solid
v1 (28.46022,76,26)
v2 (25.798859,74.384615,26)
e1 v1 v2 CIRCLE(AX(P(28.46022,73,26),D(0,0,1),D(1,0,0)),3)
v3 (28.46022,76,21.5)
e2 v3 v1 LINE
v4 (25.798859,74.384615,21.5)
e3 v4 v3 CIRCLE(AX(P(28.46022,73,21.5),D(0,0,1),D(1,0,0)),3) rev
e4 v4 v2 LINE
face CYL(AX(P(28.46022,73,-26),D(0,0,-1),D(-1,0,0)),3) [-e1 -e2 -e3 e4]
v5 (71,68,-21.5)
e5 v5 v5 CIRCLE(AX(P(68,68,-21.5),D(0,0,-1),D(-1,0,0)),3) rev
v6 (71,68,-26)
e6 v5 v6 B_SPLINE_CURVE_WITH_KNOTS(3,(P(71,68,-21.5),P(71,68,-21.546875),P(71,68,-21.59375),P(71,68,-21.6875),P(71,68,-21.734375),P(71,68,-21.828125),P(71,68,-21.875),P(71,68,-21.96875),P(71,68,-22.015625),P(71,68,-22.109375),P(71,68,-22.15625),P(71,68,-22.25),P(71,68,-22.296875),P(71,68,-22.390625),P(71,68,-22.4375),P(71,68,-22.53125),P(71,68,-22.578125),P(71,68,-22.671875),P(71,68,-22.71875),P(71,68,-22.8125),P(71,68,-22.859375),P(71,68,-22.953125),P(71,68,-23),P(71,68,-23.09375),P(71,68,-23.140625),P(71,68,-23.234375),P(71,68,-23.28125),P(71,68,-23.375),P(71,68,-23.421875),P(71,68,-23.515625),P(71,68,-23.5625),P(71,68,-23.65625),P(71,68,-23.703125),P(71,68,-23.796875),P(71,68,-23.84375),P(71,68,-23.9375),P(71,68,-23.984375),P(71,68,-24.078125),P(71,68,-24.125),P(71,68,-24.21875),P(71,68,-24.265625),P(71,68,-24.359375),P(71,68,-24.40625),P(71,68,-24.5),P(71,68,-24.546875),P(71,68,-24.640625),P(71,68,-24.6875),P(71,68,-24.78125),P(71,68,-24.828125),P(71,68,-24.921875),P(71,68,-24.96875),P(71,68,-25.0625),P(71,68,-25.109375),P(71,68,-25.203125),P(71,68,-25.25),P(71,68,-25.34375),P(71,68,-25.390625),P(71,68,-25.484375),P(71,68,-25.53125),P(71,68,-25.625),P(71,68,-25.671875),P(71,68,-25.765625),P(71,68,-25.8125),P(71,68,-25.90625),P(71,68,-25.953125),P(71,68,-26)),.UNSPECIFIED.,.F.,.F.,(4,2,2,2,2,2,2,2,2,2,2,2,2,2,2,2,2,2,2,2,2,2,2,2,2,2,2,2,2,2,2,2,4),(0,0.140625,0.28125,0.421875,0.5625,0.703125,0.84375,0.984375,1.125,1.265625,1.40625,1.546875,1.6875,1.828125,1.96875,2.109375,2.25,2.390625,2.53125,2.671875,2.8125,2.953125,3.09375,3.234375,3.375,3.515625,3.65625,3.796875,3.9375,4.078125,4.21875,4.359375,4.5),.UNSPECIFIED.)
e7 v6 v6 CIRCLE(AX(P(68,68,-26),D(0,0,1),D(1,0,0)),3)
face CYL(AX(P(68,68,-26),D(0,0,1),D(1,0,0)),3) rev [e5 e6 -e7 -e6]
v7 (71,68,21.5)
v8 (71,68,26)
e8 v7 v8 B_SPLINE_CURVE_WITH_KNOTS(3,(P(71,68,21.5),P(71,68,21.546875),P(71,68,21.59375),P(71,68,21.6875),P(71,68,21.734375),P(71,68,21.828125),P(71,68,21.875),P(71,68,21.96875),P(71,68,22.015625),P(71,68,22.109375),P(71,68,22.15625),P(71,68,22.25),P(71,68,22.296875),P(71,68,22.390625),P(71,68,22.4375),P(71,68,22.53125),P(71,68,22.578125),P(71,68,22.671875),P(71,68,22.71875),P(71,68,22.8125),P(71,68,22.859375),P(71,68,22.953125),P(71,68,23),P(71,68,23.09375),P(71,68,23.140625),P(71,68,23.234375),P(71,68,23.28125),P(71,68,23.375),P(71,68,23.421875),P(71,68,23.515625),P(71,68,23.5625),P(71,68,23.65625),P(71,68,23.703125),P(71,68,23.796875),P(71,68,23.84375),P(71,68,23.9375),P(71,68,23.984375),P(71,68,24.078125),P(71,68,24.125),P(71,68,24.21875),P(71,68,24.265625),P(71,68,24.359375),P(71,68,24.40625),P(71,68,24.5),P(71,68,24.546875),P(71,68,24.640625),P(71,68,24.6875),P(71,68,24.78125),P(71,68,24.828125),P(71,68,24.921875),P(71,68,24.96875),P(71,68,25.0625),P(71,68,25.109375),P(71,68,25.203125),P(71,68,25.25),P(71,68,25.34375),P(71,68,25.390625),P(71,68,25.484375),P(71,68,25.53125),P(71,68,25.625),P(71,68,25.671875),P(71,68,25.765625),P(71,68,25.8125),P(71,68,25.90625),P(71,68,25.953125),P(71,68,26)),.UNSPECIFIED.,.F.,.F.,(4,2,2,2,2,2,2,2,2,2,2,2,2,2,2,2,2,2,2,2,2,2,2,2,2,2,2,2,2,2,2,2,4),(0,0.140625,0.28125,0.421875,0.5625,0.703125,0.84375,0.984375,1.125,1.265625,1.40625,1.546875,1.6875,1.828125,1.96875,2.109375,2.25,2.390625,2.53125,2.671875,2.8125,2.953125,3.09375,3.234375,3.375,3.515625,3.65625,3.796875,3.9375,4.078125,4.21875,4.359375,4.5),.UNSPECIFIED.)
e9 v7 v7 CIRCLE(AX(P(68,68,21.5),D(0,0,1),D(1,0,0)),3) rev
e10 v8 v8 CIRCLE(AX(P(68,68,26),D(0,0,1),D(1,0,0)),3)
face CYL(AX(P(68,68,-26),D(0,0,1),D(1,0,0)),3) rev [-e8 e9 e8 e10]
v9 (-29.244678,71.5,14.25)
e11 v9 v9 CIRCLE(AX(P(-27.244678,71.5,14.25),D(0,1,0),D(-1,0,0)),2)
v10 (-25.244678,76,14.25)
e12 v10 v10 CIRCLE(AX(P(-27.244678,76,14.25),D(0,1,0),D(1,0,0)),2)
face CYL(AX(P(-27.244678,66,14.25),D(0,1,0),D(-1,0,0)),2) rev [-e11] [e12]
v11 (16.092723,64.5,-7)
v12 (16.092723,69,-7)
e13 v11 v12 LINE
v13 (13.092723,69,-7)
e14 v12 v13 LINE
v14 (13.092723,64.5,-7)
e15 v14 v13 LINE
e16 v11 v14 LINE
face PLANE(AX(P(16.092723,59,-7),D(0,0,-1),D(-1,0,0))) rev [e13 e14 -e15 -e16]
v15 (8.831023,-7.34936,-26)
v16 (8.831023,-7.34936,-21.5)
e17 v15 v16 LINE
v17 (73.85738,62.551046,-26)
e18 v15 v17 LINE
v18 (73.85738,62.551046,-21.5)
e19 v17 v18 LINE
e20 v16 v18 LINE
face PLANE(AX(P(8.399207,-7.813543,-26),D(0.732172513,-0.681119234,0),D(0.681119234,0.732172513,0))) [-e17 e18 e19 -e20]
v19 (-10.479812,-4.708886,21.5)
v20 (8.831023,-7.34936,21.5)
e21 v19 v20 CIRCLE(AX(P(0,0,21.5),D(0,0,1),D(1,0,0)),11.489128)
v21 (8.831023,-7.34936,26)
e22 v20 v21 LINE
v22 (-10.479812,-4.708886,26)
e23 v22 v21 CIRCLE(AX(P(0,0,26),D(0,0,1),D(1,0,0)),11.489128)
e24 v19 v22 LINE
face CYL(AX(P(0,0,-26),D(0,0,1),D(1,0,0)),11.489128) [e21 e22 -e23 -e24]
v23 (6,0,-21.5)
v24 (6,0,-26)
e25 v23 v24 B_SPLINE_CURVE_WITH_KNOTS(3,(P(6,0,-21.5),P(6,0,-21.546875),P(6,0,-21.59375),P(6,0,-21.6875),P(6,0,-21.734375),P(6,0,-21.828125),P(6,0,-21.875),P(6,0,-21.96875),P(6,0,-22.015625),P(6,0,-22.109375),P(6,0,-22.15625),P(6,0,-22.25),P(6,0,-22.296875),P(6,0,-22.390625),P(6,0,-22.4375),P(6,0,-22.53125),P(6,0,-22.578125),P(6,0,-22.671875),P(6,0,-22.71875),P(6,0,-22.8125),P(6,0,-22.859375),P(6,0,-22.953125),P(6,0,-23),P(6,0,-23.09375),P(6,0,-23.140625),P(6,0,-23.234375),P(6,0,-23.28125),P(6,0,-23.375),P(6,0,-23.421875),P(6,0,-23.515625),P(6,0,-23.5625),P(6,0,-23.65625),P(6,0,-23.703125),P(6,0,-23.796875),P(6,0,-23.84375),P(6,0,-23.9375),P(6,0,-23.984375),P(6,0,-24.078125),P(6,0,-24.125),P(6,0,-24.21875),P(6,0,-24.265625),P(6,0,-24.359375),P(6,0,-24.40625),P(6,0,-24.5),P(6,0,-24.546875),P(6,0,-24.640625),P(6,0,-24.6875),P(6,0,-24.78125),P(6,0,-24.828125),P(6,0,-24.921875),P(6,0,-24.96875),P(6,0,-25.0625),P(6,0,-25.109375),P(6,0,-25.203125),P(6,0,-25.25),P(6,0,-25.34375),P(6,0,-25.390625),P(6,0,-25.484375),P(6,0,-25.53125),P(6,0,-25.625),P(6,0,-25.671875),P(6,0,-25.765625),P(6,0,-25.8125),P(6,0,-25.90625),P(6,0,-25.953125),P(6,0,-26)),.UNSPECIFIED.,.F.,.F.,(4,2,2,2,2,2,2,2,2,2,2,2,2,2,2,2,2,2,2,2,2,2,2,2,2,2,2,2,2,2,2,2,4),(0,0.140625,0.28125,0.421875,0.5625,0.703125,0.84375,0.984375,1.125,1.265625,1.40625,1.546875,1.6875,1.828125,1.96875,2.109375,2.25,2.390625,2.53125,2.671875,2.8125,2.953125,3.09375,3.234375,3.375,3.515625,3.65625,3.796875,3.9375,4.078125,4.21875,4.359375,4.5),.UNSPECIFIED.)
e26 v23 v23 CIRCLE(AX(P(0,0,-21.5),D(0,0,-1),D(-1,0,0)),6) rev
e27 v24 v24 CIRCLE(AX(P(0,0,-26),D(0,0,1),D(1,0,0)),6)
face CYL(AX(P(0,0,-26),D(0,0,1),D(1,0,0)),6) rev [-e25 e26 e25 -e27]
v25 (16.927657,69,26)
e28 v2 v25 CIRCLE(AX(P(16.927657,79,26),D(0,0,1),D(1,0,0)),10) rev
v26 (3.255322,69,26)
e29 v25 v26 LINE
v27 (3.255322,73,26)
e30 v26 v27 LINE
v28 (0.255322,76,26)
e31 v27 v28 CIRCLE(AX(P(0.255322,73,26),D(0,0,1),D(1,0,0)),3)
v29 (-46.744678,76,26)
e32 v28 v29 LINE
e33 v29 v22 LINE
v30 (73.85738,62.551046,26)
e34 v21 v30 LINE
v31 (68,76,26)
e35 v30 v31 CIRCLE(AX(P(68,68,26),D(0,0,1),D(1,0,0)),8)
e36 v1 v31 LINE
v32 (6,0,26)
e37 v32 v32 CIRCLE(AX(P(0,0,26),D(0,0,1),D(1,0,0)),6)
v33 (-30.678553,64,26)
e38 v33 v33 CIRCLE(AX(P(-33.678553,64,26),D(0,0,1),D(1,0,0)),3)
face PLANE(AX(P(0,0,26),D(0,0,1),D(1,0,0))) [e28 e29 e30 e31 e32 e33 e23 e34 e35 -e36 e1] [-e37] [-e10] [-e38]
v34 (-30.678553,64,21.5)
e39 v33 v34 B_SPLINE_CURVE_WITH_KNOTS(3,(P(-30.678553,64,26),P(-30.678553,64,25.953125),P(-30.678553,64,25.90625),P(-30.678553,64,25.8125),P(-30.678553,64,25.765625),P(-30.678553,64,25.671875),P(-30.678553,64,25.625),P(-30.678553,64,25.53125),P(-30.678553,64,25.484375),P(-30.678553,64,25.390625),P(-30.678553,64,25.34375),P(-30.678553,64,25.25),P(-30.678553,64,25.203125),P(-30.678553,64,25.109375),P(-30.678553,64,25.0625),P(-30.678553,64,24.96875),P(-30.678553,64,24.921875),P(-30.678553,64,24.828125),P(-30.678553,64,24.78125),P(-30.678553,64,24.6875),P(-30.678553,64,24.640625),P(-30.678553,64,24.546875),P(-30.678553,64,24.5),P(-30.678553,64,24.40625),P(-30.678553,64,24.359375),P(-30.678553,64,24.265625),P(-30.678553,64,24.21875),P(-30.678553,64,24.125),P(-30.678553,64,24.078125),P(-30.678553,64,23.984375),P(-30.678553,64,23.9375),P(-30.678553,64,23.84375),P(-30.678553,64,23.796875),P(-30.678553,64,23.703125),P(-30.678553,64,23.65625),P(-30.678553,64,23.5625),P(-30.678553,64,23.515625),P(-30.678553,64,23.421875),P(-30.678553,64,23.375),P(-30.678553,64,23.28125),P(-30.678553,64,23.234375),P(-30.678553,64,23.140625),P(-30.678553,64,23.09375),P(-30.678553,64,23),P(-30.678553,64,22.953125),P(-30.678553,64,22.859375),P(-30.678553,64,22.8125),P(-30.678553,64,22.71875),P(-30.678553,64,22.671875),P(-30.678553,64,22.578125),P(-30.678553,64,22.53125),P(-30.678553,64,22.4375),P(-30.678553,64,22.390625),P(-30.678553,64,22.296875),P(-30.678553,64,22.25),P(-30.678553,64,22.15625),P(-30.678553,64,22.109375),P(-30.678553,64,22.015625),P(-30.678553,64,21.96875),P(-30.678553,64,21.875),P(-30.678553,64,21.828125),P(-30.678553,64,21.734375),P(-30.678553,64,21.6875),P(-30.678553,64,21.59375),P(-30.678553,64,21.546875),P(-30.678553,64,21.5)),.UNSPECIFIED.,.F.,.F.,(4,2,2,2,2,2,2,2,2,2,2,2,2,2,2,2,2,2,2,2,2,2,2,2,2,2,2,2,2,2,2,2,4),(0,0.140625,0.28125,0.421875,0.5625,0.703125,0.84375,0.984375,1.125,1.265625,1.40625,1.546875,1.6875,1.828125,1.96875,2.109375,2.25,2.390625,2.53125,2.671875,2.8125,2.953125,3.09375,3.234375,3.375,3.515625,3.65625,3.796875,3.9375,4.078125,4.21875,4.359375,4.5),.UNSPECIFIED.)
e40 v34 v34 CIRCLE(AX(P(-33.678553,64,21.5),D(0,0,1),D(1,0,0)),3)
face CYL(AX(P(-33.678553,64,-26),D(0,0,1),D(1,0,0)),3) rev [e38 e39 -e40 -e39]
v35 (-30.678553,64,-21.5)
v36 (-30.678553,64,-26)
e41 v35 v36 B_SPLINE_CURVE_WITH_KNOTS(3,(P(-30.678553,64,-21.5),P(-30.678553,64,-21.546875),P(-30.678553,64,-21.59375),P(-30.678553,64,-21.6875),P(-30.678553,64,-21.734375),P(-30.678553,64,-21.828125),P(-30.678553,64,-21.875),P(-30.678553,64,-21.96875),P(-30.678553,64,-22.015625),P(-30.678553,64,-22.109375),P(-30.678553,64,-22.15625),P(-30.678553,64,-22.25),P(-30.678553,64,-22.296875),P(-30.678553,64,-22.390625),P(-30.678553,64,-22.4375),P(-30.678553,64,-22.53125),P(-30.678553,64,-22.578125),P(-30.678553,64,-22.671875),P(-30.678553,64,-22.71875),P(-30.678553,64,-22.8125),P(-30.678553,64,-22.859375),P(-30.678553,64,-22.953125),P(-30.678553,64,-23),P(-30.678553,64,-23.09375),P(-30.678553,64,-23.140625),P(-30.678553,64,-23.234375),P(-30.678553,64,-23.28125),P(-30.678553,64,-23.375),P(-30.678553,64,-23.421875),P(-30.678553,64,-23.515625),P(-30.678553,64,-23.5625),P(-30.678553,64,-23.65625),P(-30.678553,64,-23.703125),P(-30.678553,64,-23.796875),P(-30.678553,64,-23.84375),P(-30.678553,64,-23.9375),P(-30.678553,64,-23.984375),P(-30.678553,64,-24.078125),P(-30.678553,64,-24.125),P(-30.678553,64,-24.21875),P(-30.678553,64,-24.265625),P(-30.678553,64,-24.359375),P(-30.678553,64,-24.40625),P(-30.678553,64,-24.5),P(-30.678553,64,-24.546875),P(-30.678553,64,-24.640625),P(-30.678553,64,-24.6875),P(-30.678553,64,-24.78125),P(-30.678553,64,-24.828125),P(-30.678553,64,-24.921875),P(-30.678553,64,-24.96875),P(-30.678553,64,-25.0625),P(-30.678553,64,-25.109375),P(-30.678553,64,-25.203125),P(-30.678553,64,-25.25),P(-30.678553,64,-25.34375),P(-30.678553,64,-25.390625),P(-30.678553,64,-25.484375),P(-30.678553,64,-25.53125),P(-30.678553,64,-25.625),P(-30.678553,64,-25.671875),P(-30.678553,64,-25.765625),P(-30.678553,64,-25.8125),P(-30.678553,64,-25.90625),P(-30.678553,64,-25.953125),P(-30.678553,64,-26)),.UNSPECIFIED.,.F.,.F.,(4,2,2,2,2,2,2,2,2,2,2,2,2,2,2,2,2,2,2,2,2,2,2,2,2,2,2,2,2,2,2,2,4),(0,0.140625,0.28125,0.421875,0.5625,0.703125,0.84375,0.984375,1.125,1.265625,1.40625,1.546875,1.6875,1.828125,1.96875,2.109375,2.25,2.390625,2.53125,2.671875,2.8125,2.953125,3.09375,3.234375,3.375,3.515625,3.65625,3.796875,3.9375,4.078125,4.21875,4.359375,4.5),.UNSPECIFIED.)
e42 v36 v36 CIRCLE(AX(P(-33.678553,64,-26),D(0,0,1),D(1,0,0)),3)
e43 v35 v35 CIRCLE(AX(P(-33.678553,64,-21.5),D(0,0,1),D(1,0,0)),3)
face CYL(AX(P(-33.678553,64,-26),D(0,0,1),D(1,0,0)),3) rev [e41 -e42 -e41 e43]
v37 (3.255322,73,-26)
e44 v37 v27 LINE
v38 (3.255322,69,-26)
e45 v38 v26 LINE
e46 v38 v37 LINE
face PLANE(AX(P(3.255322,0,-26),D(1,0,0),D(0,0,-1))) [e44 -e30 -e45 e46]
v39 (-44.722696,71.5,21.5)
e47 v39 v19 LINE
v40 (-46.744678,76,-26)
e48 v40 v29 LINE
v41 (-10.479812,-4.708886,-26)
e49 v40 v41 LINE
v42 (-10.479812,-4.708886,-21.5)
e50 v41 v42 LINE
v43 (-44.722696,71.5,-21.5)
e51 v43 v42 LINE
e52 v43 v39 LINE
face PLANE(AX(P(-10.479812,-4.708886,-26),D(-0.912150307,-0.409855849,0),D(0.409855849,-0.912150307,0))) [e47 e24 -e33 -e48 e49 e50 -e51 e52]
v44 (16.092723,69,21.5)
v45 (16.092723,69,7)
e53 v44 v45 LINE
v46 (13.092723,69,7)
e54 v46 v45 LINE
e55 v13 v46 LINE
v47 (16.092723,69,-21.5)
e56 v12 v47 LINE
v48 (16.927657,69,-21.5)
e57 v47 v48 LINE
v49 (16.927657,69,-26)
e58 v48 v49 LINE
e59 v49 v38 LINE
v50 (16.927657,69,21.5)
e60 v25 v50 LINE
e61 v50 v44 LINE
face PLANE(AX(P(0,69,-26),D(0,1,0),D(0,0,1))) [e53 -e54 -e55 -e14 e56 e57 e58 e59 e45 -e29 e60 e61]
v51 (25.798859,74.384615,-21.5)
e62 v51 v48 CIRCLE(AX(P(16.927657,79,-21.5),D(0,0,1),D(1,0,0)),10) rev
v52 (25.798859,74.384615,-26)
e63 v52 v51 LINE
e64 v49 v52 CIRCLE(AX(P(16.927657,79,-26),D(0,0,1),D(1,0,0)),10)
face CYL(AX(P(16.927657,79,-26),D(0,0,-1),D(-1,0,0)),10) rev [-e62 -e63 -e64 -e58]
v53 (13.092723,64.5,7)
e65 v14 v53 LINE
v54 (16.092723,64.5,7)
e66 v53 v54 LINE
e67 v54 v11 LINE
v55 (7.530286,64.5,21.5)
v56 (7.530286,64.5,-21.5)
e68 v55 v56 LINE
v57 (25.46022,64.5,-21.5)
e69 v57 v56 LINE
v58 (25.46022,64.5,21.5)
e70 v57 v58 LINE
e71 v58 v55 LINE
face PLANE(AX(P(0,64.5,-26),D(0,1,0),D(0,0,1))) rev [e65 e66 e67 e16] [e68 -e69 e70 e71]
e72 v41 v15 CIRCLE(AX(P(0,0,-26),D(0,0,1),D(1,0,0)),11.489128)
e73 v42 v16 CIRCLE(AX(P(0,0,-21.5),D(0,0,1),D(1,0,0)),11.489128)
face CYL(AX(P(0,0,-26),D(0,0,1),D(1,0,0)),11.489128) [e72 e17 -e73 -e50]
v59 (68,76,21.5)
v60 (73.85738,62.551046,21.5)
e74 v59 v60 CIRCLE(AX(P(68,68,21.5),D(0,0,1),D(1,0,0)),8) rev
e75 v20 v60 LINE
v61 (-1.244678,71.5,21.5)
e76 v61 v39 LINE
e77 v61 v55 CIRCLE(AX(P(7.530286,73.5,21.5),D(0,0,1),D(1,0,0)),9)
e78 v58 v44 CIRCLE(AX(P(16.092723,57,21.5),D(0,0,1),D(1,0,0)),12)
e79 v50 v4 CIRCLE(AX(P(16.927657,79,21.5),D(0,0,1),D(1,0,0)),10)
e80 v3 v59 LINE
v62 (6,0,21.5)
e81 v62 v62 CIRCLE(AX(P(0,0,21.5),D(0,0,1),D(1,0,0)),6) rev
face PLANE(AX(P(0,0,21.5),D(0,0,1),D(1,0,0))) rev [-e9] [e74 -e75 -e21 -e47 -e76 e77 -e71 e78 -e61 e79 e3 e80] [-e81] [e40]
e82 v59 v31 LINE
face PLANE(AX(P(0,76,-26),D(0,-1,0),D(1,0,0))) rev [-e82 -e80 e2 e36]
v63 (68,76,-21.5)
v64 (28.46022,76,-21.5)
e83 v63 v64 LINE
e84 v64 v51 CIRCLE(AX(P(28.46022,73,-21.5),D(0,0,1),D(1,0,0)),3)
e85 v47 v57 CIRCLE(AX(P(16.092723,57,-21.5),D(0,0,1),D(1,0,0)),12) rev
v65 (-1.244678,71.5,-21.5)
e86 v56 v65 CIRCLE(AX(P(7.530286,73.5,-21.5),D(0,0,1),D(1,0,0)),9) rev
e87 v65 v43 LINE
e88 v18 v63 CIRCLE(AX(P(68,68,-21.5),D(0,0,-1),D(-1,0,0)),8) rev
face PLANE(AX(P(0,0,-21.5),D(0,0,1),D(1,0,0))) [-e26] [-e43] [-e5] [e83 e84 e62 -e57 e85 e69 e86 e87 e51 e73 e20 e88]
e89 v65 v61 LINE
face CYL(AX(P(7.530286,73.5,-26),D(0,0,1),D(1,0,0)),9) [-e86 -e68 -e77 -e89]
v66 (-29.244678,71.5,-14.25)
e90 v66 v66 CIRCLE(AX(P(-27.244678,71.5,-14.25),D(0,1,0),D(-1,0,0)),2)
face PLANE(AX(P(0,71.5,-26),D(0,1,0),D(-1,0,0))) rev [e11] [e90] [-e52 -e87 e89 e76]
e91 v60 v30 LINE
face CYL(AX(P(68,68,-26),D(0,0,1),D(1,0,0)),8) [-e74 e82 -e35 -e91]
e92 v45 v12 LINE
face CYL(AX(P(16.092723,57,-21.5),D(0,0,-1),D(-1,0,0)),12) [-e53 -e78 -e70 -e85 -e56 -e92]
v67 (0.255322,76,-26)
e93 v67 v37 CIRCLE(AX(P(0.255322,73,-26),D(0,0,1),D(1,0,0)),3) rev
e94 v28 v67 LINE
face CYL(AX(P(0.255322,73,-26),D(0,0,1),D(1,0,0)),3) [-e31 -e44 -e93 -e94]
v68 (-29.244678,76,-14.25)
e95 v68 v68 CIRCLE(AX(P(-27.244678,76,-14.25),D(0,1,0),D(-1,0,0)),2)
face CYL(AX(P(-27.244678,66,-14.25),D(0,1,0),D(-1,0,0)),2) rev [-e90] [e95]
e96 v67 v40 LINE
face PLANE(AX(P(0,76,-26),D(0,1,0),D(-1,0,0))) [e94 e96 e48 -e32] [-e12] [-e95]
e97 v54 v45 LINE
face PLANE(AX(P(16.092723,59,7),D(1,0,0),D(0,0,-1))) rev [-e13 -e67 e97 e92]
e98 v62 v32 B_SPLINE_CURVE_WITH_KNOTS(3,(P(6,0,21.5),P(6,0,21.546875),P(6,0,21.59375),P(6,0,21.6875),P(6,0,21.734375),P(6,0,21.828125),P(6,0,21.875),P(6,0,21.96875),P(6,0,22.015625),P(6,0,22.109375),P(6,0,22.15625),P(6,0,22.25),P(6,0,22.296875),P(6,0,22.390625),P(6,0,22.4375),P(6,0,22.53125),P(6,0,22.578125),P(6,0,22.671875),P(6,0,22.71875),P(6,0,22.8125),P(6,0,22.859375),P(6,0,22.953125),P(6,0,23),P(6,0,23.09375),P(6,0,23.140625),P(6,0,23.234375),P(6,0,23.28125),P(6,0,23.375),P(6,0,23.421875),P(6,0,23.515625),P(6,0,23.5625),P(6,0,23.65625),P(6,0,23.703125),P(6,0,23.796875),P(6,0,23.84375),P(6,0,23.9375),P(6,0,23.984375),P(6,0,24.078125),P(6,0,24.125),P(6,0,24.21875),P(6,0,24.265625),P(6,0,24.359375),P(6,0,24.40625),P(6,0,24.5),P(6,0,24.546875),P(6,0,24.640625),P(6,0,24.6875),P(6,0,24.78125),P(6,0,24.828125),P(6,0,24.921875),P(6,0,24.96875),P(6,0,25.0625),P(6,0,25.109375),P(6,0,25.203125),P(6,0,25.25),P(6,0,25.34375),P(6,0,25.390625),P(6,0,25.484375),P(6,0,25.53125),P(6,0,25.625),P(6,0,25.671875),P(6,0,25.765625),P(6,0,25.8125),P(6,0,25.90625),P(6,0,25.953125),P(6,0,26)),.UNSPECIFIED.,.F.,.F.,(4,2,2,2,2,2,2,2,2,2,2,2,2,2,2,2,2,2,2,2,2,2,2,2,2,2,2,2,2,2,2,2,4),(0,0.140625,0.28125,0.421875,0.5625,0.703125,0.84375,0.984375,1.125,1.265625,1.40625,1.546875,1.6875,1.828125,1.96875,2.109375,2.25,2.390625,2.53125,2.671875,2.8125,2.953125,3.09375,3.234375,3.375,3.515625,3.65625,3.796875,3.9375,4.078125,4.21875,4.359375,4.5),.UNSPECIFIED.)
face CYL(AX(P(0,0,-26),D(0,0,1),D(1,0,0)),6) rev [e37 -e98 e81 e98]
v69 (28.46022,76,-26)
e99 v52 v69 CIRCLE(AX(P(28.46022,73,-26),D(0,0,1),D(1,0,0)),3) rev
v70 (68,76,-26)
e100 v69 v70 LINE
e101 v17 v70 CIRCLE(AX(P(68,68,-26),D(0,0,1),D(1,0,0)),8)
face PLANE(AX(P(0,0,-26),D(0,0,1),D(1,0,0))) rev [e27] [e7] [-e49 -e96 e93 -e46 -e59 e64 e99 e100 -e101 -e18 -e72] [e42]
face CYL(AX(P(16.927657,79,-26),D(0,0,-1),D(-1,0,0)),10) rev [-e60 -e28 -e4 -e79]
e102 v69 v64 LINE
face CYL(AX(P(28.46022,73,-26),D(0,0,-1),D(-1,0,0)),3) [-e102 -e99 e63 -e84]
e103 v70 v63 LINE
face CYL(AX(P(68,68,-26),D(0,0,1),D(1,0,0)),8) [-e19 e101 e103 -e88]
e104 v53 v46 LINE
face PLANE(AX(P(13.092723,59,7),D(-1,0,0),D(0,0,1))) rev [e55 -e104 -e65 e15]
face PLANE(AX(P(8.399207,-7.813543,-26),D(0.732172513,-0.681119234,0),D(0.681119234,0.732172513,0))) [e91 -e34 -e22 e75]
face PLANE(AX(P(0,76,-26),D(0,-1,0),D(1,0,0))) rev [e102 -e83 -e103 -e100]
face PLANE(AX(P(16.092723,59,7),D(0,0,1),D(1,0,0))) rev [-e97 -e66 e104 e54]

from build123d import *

# Parameters (mm, degrees)
RESSALTO_EXTRUS_O1_DEPTH      = 26
RESSALTO_EXTRUS_O1_DEPTH_BACK = 26
ESBO_O10_R                    = 6
ESBO_O10_R_2                  = 3
CASCA1_START                  = -21.5
CASCA1_OUTLINE_R              = 10.5
CASCA1_DEPTH                  = 43
CORTE_EXTRUS_O1_DEPTH         = 111.580287574
CORTE_EXTRUS_O1_DEPTH_BACK    = 111.580287574
ESBO_O12_W                    = 43
ESBO_O12_H                    = 35.359478928
FILETE3_R                     = 9
ESBO_O17_W                    = 71.509931374
ESBO_O17_H                    = 43
CORTE_EXTRUS_O6_DEPTH         = 20
FILETE7_R                     = 3
FILETE8_R                     = 3
FILETE9_R                     = 12
ESBO_O18_W                    = 3
ESBO_O18_H                    = 14
CORTE_EXTRUS_O7_DEPTH         = 10
CORTE_EXTRUS_O8_DEPTH         = 120.398492453
CORTE_EXTRUS_O8_DEPTH_BACK    = 120.398492453
ESBO_O19_R                    = 3
FILETE10_R                    = 10
ESBO_O20_R                    = 2
CORTE_EXTRUS_O10_DEPTH        = 10


# Read off the part's stored shape, not the designer's step: Casca1
with BuildPart() as part:
    # Esboço10 → Ressalto-extrusão1 (new, two sides: drawn at the far end of the back side and taken through both)
    with BuildSketch(Plane.XY.offset(-RESSALTO_EXTRUS_O1_DEPTH_BACK)):
        with BuildLine():
            Line((8.831023296, -7.34936003), (73.857380106, 62.551046129))
            ThreePointArc((73.857380106, 62.551046129), (75.334563074, 71.194398928), (68, 76))
            Line((68, 76), (25.460219944, 76))
            Line((25.460219944, 76), (25.460219944, 69))
            Line((25.460219944, 69), (3.255321751, 69))
            Line((3.255321751, 69), (3.255321751, 76))
            Line((3.255321751, 76), (-46.744678249, 76))
            Line((-46.744678249, 76), (-10.47981176, -4.708886362))
            ThreePointArc((-10.47981176, -4.708886362), (-1.556486796, -11.383207552), (8.831023296, -7.34936003))
        make_face()
        Circle(ESBO_O10_R, mode=Mode.SUBTRACT)
        with Locations((68, 68)):
            Circle(ESBO_O10_R_2, mode=Mode.SUBTRACT)
    extrude(amount=RESSALTO_EXTRUS_O1_DEPTH + RESSALTO_EXTRUS_O1_DEPTH_BACK)

    # Casca1 outline → Casca1 (cut)
    with BuildSketch(Plane.XY.offset(CASCA1_START)):
        with BuildLine():
            Line((8.831023296, -7.34936003), (73.857380106, 62.551046129))
            Line((73.857380106, 62.551046129), (73.491293849, 62.891605746))
            ThreePointArc((73.491293849, 62.891605746), (63.658096197, 61.884620096), (61.366750419, 71.5))
            Line((61.366750419, 71.5), (29.960219944, 71.5))
            Line((29.960219944, 71.5), (29.960219944, 64.5))
            Line((29.960219944, 64.5), (-1.244678249, 64.5))
            Line((-1.244678249, 64.5), (-1.244678249, 71.5))
            Line((-1.244678249, 71.5), (-44.722696451, 71.5))
            Line((-44.722696451, 71.5), (-10.47981176, -4.708886362))
            ThreePointArc((-10.47981176, -4.708886362), (-1.556486796, -11.383207552), (8.831023296, -7.34936003))
        make_face()
        Circle(CASCA1_OUTLINE_R, mode=Mode.SUBTRACT)
    extrude(amount=CASCA1_DEPTH, mode=Mode.SUBTRACT)

    # Esboço12 → Corte-extrusão1 (cut, two sides: drawn at the far end of the back side and taken through both)
    with BuildSketch(Plane(origin=(0, 0, 0), x_dir=(0, 0, -1), z_dir=(1, 0, 0)).offset(-CORTE_EXTRUS_O1_DEPTH_BACK)):
        Rectangle(ESBO_O12_W, ESBO_O12_H)
    extrude(amount=CORTE_EXTRUS_O1_DEPTH + CORTE_EXTRUS_O1_DEPTH_BACK, mode=Mode.SUBTRACT)

    # Filete3
    # the kernel refuses this fillet: 9 mm, written as the material it takes off along each edge
    with BuildSketch(Plane(origin=(-1.244678249, 64.5, -21.5), x_dir=(0, 1, 0), z_dir=(0, 0, 1))) as filete3_piece_1:
        with BuildLine():
            CenterArc((9, -8.774964387), FILETE3_R, 102.839588407, 77.160411593)
            Line((0, -8.774964387), (0, 0))
            Line((0, 0), (7, 0))
        make_face()
    extrude(amount=43, mode=Mode.SUBTRACT)

    # Esboço17 → Corte-extrusão6 (cut)
    with BuildSketch(Plane(origin=(0, 76, 0), x_dir=(1, 0, 0), z_dir=(0, 1, 0))):
        with Locations((61.215185631, 0)):
            Rectangle(ESBO_O17_W, ESBO_O17_H)
    extrude(amount=-CORTE_EXTRUS_O6_DEPTH, mode=Mode.SUBTRACT)

    # Filete7
    filete7_edges = [part.edges().sort_by_distance(p)[0] for p in [
        (25.460219944, 76, 23.75),
        (25.460219944, 76, -23.75),
    ]]
    fillet(filete7_edges, radius=FILETE7_R)

    # Filete8
    filete8_edges = [part.edges().sort_by_distance(p)[0] for p in [
        (3.255321751, 76, 0),
    ]]
    fillet(filete8_edges, radius=FILETE8_R)

    # Filete9
    # the kernel refuses this fillet: 12 mm, written as the material it takes off along each edge
    with BuildSketch(Plane(origin=(25.460219944, 69, -21.5), x_dir=(-1, 0, 0), z_dir=(0, 0, 1))) as filete9_piece_1:
        with BuildLine():
            CenterArc((9.367496998, 12), FILETE9_R, 218.682187453, 51.317812547)
            Line((0, 4.5), (0, 0))
            Line((0, 0), (9.367496998, 0))
        make_face()
    extrude(amount=43, mode=Mode.SUBTRACT)

    # Esboço18 → Corte-extrusão7 (cut)
    with BuildSketch(Plane(origin=(0, 69, 0), x_dir=(1, 0, 0), z_dir=(0, 1, 0))):
        with Locations((14.592722946, 0)):
            Rectangle(ESBO_O18_W, ESBO_O18_H)
    extrude(amount=-CORTE_EXTRUS_O7_DEPTH, mode=Mode.SUBTRACT)

    # Esboço19 → Corte-extrusão8 (cut, two sides: drawn at the far end of the back side and taken through both)
    with BuildSketch(Plane.XY.offset(26).offset(-CORTE_EXTRUS_O8_DEPTH_BACK)):
        with Locations((-33.678552977, 64)):
            Circle(ESBO_O19_R)
    extrude(amount=CORTE_EXTRUS_O8_DEPTH + CORTE_EXTRUS_O8_DEPTH_BACK, mode=Mode.SUBTRACT)

    # Filete10
    filete10_edges = [part.edges().sort_by_distance(p)[0] for p in [
        (25.460219944, 69, -23.75),
        (25.460219944, 69, 23.75),
    ]]
    fillet(filete10_edges, radius=FILETE10_R)

    # Esboço20 → Corte-extrusão10 (cut)
    with BuildSketch(Plane(origin=(0, 76, 0), x_dir=(1, 0, 0), z_dir=(0, 1, 0))):
        with Locations(Location((-27.244678249, 14.25, 0), (0, 0, 180))):
            Circle(ESBO_O20_R)
        with Locations(Location((-27.244678249, -14.25, 0), (0, 0, 180))):
            Circle(ESBO_O20_R)
    extrude(amount=-CORTE_EXTRUS_O10_DEPTH, mode=Mode.SUBTRACT)


solid = part.part
